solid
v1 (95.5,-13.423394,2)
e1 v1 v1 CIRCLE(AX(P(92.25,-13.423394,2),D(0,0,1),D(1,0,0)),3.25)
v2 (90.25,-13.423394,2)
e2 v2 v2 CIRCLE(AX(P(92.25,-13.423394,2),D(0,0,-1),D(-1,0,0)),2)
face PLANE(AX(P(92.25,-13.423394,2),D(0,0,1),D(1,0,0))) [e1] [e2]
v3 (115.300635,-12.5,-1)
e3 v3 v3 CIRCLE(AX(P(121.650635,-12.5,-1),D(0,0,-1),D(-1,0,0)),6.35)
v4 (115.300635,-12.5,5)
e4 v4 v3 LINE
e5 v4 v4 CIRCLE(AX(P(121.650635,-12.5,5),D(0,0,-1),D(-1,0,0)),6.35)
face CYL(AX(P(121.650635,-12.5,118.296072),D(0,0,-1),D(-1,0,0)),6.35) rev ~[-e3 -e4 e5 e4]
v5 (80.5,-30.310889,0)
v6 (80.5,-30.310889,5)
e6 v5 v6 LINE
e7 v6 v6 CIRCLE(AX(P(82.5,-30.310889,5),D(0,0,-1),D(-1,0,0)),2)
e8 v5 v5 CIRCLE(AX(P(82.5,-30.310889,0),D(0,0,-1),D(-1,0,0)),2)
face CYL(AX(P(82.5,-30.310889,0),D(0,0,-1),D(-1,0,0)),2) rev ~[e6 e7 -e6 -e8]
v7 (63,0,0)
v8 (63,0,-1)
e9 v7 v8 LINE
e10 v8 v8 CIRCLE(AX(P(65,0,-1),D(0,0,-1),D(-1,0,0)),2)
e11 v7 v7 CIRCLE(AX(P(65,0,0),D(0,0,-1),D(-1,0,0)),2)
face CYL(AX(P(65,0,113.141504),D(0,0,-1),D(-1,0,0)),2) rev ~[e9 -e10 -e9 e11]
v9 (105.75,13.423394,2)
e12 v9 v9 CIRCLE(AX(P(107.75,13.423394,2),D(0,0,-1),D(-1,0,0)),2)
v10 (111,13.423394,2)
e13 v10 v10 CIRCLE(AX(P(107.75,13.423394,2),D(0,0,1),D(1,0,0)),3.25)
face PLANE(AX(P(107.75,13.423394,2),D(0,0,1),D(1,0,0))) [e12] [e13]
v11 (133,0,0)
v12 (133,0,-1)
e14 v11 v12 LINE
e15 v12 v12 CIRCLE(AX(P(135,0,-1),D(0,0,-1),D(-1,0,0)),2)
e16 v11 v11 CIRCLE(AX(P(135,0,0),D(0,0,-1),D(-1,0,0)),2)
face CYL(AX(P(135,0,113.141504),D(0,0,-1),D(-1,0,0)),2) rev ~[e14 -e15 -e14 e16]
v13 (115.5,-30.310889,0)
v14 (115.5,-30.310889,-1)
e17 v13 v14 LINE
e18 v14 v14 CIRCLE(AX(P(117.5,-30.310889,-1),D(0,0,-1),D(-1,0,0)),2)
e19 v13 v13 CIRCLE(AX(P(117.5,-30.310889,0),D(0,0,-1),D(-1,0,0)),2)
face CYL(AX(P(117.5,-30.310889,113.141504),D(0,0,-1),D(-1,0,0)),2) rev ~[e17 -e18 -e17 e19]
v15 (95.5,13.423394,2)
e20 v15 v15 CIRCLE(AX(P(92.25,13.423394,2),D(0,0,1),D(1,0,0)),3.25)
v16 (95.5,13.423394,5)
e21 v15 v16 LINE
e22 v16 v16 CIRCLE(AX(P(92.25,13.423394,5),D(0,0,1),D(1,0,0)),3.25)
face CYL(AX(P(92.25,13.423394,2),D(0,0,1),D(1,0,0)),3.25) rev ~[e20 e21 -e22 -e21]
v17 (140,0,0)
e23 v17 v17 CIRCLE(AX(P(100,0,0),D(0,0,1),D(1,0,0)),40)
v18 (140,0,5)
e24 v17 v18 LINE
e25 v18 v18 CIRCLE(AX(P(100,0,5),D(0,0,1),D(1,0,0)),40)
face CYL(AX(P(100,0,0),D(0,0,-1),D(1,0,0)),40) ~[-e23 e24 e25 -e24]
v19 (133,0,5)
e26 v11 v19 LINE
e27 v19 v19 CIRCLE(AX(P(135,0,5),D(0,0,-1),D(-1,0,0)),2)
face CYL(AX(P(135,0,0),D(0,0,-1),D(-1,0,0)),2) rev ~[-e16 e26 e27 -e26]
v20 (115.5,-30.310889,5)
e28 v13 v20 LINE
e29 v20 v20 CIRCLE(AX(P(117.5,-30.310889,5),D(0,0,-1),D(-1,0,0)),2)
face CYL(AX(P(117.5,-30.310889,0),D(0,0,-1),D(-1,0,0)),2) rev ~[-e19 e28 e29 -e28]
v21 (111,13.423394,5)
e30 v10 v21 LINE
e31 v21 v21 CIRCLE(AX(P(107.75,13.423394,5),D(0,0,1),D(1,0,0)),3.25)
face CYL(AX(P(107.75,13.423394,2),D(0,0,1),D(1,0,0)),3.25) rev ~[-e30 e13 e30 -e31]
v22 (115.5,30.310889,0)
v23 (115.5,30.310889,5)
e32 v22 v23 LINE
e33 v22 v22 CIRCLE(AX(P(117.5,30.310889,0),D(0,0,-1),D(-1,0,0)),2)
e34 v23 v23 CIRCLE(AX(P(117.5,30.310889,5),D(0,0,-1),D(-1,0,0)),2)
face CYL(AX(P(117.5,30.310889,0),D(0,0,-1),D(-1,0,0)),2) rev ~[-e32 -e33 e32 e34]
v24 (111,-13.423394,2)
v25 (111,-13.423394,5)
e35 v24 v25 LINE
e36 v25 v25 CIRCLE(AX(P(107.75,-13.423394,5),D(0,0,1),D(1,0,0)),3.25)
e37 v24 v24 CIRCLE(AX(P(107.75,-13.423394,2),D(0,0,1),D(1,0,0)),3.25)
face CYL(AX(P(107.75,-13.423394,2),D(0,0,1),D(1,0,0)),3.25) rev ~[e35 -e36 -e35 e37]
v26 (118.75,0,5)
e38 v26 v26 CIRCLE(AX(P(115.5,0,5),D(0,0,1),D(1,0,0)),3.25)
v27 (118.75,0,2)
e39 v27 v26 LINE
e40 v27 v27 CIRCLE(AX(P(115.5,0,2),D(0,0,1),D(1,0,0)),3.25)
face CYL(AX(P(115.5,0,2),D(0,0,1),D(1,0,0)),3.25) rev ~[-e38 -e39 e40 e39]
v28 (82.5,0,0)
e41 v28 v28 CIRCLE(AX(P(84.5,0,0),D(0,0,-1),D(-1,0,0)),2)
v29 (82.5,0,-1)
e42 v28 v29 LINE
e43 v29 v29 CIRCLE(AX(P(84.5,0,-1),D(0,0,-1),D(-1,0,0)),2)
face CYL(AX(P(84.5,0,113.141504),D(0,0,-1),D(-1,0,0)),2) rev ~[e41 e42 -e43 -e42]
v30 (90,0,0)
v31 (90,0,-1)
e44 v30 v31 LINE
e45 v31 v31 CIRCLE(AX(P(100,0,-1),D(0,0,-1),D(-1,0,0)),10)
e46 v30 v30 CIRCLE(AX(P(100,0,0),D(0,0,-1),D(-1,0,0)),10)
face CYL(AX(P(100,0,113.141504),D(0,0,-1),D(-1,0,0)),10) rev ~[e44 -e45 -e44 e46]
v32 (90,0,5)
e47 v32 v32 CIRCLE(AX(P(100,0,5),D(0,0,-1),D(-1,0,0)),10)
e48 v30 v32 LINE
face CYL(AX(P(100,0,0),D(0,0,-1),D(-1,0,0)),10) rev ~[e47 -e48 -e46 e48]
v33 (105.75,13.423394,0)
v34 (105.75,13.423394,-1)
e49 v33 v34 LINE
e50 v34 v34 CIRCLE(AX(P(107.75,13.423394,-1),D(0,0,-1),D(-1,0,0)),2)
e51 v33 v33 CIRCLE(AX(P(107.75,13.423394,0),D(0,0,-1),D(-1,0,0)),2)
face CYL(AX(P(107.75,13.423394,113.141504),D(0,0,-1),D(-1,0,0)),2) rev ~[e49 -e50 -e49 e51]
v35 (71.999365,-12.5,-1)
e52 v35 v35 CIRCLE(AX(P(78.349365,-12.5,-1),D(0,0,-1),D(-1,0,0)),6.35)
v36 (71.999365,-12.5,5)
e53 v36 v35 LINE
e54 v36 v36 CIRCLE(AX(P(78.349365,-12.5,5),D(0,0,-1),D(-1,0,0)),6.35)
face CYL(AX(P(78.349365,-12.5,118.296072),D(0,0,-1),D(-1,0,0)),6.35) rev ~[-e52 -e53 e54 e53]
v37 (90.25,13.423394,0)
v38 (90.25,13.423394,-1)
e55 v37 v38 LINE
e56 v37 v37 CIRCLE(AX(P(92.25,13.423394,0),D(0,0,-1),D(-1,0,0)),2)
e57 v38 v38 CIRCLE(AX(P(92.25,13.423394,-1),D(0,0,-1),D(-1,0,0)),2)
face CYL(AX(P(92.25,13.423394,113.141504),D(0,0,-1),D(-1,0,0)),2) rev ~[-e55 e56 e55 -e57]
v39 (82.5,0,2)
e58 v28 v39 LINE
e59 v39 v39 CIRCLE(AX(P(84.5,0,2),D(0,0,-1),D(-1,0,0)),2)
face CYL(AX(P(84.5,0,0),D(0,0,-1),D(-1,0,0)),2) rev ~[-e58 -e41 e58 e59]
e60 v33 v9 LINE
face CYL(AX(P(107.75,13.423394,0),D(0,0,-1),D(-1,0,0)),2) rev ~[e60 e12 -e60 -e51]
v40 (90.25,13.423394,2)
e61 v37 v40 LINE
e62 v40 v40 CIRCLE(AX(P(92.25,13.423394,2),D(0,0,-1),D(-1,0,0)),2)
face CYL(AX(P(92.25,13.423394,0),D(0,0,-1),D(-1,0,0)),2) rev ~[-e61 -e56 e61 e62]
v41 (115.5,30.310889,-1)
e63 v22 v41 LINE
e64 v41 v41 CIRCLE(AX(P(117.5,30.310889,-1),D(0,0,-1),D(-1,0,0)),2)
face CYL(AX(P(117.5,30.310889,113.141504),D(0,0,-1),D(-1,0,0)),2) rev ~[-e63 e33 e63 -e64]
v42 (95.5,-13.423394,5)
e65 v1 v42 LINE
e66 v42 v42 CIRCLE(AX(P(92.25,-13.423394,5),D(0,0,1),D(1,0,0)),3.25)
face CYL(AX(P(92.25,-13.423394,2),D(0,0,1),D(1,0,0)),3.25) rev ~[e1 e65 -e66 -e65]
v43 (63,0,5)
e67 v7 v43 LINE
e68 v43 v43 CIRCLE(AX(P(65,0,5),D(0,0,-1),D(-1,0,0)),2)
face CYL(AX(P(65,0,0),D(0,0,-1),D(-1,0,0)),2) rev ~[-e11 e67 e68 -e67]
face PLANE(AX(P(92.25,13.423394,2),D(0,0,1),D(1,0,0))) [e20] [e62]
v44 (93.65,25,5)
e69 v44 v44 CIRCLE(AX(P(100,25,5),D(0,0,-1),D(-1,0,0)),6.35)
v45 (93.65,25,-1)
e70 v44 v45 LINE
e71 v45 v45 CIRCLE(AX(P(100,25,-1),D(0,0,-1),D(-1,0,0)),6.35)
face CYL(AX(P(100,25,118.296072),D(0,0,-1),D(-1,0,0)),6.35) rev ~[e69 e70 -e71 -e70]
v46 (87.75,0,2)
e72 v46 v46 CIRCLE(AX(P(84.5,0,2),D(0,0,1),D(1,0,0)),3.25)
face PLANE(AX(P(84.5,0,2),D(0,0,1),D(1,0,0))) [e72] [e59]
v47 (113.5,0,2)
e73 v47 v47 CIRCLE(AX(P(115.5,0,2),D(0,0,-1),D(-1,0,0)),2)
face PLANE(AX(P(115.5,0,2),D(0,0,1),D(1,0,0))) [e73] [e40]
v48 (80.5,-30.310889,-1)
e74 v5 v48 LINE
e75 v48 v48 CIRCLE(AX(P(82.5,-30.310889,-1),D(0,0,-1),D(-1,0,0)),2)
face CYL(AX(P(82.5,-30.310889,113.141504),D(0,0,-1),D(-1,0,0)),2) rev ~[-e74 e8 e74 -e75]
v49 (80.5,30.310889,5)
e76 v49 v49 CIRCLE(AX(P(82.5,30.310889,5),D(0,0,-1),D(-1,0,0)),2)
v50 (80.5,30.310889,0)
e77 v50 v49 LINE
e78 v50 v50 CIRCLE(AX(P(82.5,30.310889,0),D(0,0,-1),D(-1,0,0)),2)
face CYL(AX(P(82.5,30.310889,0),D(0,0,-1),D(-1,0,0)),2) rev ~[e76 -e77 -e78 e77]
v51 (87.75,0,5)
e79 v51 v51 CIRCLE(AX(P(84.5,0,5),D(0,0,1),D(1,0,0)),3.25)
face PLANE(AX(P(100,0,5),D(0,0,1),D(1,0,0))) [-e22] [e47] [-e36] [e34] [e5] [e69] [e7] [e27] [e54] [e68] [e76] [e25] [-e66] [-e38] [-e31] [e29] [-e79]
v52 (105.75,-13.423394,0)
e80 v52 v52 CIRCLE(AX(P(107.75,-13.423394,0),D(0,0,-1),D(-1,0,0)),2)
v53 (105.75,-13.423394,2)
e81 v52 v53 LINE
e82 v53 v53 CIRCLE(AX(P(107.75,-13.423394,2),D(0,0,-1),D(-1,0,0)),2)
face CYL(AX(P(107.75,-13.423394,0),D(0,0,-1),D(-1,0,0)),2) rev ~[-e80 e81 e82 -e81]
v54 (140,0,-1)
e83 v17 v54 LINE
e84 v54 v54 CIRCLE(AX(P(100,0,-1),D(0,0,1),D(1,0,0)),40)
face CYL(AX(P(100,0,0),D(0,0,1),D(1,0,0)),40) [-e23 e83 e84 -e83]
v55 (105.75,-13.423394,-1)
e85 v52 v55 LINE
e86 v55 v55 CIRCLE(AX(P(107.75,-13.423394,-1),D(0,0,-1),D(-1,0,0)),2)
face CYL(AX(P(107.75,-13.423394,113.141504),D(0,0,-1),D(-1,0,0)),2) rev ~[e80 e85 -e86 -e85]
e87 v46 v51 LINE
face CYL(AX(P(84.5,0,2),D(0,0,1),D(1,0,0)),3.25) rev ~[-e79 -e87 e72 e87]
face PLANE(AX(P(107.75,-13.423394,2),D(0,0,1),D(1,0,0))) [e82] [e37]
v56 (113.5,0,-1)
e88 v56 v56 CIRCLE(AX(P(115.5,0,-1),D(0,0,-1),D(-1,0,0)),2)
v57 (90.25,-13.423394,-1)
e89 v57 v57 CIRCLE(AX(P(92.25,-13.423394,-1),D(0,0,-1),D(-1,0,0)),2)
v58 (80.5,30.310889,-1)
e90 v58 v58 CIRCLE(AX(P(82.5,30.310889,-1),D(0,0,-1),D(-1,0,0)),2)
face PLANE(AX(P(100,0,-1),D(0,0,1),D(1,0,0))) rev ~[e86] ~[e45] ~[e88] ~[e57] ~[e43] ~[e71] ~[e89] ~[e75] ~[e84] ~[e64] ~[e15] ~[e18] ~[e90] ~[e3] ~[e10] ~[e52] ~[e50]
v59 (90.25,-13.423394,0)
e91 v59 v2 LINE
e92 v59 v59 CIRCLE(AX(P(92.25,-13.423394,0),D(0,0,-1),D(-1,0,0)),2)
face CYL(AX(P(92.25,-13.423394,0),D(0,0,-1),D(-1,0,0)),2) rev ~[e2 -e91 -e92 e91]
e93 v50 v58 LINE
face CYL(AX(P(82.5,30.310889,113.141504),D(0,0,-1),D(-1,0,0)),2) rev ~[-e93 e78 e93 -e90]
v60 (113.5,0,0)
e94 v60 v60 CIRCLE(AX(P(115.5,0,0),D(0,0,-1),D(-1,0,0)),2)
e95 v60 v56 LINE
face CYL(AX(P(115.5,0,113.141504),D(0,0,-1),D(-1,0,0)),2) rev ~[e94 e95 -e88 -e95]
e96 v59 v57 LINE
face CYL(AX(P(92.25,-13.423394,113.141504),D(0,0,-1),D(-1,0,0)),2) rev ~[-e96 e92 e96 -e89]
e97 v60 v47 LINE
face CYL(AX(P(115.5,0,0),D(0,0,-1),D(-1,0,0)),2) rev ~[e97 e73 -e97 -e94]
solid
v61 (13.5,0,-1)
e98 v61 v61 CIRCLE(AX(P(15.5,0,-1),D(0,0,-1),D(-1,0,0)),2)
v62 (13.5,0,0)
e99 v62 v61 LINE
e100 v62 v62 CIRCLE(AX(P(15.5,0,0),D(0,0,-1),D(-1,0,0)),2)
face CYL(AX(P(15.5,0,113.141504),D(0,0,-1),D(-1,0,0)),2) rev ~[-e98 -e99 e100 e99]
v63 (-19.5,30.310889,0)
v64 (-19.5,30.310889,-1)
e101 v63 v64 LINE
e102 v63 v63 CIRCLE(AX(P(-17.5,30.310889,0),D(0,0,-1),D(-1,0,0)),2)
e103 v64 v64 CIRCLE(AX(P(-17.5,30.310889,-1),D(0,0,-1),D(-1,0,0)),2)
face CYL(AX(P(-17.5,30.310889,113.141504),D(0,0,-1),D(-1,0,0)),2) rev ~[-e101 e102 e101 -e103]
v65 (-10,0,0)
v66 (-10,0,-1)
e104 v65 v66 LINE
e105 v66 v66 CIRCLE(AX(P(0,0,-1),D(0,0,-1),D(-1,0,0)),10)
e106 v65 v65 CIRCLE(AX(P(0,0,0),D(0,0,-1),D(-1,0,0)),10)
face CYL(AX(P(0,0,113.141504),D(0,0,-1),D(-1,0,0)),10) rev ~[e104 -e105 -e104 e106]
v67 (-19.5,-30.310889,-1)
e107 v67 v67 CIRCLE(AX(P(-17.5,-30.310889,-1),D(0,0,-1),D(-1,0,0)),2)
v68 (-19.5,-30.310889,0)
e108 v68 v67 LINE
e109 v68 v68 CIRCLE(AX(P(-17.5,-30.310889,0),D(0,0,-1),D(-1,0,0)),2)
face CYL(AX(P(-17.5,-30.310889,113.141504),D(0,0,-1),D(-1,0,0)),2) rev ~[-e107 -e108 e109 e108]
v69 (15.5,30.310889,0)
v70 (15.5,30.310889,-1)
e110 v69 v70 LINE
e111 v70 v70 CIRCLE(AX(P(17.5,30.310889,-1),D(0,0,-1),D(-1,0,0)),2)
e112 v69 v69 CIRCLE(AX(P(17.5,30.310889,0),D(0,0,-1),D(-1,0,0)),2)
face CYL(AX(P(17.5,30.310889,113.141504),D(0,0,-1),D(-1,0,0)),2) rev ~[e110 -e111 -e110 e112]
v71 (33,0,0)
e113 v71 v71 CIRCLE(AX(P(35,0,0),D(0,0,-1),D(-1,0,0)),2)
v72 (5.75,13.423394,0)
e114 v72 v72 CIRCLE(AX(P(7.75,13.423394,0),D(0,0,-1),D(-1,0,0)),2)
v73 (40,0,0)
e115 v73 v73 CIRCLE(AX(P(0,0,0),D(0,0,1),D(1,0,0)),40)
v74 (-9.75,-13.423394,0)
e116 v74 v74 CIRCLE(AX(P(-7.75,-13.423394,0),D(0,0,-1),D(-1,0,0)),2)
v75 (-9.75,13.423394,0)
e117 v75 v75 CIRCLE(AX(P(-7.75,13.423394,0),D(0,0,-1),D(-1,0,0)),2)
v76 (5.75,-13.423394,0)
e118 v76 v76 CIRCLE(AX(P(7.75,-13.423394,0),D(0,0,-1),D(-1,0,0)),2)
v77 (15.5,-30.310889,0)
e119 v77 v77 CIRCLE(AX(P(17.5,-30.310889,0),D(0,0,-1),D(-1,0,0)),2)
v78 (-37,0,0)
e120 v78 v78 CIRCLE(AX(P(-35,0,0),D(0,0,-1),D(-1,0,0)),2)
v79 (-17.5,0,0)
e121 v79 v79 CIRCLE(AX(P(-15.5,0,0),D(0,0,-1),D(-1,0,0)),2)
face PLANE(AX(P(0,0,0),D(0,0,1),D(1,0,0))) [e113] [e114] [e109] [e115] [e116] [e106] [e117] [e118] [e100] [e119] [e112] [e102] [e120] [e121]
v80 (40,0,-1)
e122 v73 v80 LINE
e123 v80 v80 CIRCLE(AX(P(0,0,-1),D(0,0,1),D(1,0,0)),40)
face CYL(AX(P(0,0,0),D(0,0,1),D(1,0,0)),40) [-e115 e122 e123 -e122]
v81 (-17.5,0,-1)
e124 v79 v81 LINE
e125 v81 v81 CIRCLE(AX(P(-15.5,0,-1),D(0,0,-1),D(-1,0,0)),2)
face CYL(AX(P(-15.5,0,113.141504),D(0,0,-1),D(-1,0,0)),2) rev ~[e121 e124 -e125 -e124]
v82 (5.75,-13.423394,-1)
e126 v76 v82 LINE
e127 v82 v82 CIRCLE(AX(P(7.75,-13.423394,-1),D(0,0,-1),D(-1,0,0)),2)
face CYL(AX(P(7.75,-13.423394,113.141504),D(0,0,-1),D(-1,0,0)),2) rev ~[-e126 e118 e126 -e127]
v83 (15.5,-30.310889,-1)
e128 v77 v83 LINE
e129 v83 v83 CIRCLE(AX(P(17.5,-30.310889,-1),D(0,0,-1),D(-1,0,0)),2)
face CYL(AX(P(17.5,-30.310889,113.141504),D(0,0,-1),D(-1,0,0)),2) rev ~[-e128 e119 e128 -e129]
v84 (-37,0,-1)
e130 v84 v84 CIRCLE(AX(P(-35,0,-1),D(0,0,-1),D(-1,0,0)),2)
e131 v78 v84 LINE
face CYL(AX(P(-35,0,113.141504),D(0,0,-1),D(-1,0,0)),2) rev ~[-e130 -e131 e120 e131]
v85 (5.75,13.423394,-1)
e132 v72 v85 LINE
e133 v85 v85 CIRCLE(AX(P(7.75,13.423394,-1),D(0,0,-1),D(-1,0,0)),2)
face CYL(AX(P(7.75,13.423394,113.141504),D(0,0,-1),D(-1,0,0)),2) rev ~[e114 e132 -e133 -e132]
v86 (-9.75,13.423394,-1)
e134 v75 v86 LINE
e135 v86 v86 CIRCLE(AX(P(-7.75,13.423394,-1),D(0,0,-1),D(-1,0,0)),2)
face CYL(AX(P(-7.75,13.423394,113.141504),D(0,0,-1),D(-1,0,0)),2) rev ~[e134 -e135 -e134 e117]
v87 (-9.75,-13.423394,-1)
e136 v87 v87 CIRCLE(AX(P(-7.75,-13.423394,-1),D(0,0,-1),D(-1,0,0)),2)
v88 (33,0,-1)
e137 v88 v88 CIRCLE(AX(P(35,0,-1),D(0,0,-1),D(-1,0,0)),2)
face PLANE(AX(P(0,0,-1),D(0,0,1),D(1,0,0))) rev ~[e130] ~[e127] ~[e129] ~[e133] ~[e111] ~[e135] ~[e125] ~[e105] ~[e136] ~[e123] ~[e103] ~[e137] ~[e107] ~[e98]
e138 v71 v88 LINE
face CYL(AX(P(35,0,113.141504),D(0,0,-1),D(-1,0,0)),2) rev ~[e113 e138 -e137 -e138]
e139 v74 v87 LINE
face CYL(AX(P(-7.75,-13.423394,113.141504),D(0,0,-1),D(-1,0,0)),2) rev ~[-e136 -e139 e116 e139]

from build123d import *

# Parameters (mm, degrees)
F0_R           = 40
F0_R_2         = 30
F1_DEPTH       = 1
F2_D           = 4
F3_D           = 20
F5_DEPTH       = 5
F7_D           = 3.15
F7_CBORE_D     = 6.5
F7_CBORE_DEPTH = 3
F9_D           = 12.7


# Not quite as in the source:
# - a feature names something its author has since deleted; it is built from what else it names


with BuildPart() as f1:
    # F0 (on Top) → F1 (new body)
    with BuildSketch(Plane.XY):
        Circle(F0_R)
        Circle(F0_R_2, mode=Mode.SUBTRACT)
        Circle(F0_R_2)
    extrude(amount=-F1_DEPTH)

    # F2 (through all)
    with Locations(Plane.XY):
        with Locations((35, 0), (17.5, 30.3108891325), (-17.5, 30.3108891325), (-35, 0), (-17.5, -30.3108891325), (17.5, -30.3108891325), (-7.75, -13.4233937587), (7.75, -13.4233937587), (15.5, 0), (7.75, 13.4233937587), (-7.75, 13.4233937587), (-15.5, 0)):
            Hole(F2_D / 2)

    # F3 (through all)
    with Locations(Plane.XY):
        with Locations((0, 0)):
            Hole(F3_D / 2)


with BuildPart() as f4_1:
    # F4: copy of F1
    add(f1.part.moved(Location((100, 0, 0))))

    # F5 (add): a face of the model
    f5_faces = [f4_1.faces().sort_by_distance(p)[0] for p in [
        (61.1313708499, 0, 0),
    ]]
    extrude(f5_faces, amount=F5_DEPTH)

    # F7 (through all)
    with Locations(Plane.XY.offset(5)):
        with Locations((115.5, 0), (107.75, -13.4233937587), (92.25, -13.4233937587), (84.5, 0), (92.25, 13.4233937587), (107.75, 13.4233937587)):
            CounterBoreHole(F7_D / 2, F7_CBORE_D / 2, F7_CBORE_DEPTH)

    # F9 (through all)
    with Locations(Plane.XY.offset(5)):
        with Locations((100, 25), (121.6506350946, -12.5), (78.3493649054, -12.5)):
            Hole(F9_D / 2)


solid = Compound([f1.part, f4_1.part])
